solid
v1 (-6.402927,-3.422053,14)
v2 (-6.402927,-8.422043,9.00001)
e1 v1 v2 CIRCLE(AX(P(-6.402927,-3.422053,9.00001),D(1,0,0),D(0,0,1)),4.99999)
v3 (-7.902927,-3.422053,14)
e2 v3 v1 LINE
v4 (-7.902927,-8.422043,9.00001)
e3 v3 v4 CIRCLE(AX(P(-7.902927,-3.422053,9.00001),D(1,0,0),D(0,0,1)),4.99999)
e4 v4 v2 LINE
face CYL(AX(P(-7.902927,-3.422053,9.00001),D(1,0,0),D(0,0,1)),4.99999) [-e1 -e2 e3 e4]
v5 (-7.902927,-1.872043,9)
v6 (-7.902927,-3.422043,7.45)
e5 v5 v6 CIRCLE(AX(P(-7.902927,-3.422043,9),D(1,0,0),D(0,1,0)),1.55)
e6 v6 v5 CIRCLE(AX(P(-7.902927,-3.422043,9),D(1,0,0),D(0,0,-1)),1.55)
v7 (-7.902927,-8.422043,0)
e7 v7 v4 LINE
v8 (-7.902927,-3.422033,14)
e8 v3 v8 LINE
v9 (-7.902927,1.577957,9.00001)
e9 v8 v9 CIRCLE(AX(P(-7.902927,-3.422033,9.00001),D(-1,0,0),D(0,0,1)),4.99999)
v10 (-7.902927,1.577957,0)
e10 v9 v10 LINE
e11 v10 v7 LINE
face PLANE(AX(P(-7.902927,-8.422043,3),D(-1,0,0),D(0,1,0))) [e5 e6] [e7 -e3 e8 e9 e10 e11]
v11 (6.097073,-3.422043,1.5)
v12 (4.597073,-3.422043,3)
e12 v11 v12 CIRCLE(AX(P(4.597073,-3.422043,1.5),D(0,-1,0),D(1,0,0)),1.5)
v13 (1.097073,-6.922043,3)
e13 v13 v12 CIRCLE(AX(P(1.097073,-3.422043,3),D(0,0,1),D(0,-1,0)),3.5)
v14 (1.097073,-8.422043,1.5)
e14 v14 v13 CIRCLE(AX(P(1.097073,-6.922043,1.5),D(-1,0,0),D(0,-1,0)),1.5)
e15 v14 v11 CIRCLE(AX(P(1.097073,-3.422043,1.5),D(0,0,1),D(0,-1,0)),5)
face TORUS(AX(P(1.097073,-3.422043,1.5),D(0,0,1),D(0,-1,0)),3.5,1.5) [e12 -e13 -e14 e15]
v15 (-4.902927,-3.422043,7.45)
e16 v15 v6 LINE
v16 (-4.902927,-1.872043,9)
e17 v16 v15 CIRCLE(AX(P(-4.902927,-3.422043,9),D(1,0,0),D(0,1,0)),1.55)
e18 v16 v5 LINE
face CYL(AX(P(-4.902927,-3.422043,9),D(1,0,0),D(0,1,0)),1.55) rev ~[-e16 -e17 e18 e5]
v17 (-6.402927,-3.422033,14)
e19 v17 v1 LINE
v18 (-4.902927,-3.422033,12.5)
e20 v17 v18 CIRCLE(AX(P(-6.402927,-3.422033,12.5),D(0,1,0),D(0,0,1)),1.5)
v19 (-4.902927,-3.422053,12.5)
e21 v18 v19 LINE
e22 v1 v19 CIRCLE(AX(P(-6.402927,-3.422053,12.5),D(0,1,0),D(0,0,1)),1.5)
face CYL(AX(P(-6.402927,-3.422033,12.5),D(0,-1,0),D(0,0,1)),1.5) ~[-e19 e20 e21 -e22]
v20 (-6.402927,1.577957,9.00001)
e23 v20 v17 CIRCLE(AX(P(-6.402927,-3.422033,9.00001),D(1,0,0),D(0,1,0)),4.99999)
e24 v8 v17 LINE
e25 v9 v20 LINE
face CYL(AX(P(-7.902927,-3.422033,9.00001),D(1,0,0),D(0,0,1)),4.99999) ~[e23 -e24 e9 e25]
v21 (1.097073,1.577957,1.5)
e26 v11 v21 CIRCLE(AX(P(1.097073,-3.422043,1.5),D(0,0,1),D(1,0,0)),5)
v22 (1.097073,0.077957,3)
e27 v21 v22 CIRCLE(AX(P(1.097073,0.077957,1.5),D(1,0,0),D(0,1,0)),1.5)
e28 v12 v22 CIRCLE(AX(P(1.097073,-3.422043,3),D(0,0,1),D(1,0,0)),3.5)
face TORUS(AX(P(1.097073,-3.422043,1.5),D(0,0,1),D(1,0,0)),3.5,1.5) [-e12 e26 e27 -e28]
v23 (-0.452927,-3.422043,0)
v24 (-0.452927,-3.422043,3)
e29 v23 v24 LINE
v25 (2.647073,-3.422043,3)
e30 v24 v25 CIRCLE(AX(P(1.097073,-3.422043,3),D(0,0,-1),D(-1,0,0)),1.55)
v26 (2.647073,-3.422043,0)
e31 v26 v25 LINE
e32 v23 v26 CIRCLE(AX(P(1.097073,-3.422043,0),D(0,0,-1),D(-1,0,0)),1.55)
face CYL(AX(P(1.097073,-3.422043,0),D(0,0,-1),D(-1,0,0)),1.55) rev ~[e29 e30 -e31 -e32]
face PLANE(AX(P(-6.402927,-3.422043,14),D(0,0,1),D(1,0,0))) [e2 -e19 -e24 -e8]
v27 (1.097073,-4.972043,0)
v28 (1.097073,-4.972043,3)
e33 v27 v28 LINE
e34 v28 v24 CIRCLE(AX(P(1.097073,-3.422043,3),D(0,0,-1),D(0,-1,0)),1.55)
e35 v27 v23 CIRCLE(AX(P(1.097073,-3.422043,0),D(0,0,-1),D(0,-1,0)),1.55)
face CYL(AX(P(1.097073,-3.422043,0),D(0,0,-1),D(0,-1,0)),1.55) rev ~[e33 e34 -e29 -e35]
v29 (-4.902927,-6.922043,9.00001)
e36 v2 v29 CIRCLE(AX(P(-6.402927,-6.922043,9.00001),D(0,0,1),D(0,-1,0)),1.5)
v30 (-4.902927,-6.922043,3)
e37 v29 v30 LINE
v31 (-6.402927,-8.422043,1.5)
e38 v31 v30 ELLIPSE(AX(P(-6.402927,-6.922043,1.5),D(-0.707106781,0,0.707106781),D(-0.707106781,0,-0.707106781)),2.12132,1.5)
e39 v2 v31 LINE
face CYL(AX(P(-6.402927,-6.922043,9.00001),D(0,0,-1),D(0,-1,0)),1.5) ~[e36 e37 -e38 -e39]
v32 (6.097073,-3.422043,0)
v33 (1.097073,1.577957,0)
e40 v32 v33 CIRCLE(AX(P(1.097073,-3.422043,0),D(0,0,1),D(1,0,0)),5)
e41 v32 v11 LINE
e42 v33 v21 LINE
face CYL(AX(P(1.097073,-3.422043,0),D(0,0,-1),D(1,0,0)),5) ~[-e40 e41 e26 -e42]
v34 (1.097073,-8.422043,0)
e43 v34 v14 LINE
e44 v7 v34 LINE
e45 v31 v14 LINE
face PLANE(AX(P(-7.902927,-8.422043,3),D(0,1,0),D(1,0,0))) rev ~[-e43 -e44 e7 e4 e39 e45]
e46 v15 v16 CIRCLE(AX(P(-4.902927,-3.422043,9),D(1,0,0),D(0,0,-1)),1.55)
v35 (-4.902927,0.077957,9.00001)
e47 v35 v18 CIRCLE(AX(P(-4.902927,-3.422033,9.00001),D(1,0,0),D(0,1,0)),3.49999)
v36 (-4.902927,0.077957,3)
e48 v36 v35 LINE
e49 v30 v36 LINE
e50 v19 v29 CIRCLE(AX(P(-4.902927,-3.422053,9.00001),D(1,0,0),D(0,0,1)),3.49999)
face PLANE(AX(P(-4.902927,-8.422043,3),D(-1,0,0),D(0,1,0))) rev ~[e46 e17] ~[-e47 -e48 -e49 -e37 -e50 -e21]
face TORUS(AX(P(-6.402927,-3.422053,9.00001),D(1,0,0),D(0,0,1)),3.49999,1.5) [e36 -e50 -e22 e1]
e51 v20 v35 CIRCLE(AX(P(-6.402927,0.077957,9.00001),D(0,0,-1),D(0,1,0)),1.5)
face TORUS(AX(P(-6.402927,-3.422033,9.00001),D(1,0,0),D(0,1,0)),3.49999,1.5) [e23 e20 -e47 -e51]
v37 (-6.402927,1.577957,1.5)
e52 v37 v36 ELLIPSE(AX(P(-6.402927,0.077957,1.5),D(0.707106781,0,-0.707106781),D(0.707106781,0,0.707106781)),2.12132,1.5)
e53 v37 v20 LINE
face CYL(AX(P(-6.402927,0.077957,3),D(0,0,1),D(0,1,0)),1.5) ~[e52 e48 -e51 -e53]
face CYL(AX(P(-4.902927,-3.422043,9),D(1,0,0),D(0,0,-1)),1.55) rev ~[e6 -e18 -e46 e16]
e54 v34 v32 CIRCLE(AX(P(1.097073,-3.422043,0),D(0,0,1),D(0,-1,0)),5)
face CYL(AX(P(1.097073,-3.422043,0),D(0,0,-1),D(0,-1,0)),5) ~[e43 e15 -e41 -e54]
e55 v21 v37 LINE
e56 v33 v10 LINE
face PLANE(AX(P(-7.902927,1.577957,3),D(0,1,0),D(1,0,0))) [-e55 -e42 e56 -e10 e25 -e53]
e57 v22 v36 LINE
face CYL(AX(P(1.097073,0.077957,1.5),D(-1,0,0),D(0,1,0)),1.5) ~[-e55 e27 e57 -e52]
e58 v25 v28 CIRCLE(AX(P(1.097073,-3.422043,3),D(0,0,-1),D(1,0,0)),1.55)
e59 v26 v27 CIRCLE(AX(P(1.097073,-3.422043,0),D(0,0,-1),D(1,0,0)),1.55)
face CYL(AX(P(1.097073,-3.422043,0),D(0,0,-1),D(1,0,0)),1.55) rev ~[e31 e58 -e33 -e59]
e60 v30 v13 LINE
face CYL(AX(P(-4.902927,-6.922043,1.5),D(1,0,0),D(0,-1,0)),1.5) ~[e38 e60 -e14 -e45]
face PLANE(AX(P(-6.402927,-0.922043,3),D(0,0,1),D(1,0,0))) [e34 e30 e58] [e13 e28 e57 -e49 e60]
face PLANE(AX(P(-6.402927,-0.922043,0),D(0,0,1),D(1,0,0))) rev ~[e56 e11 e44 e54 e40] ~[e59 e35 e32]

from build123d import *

# Parameters (mm, degrees)
F0_W     = 3
F0_H     = 5
F1_DEPTH = 3
F2_W     = 3
F2_H     = 10
F3_DEPTH = 11
F5_DEPTH = 25
F6_R     = 4.99999
F7_R     = 1.5


# Not quite as in the source:
# - a fillet or chamfer is up to 0.001 mm smaller than in the source, because OpenCascade refuses the exact size


with BuildPart() as f1:
    # F0 (on Top) → F1 (new body)
    with BuildSketch(Plane.XY):
        with Locations((-6.4029270411, -0.9220428518)):
            Rectangle(F0_W, F0_H)
        with Locations((-6.4029270411, -5.9220428518)):
            Rectangle(F0_W, F0_H)
        with BuildLine():
            Line((-4.9029270411, 1.5779571482), (-4.9029270411, -3.4220428518))
            Line((-4.9029270411, -3.4220428518), (-0.4529270411, -3.4220428518))
            ThreePointArc((-0.4529270411, -3.4220428518), (1.0970729589, -1.8720428518), (2.6470729589, -3.4220428518))
            ThreePointArc((2.6470729589, -3.4220428518), (2.1930884698, -4.5180583627), (1.0970729589, -4.9720428518))
            Line((1.0970729589, -4.9720428518), (1.0970729589, -8.4220428518))
            ThreePointArc((1.0970729589, -8.4220428518), (4.6326068649, -6.9575767578), (6.0970729589, -3.4220428518))
            ThreePointArc((6.0970729589, -3.4220428518), (4.6326068649, 0.1134910541), (1.0970729589, 1.5779571482))
            Line((1.0970729589, 1.5779571482), (-4.9029270411, 1.5779571482))
        make_face()
        with BuildLine():
            Line((-0.4529270411, -3.4220428518), (-4.9029270411, -3.4220428518))
            Line((-4.9029270411, -3.4220428518), (-4.9029270411, -8.4220428518))
            Line((-4.9029270411, -8.4220428518), (1.0970729589, -8.4220428518))
            Line((1.0970729589, -8.4220428518), (1.0970729589, -4.9720428518))
            ThreePointArc((1.0970729589, -4.9720428518), (0.0010574481, -4.5180583627), (-0.4529270411, -3.4220428518))
        make_face()
    extrude(amount=F1_DEPTH)

    # F2 (on face) → F3 (join)
    with BuildSketch(Plane.XY.offset(3)):
        with Locations((-6.4029270411, -3.4220428518)):
            Rectangle(F2_W, F2_H)
    extrude(amount=F3_DEPTH)

    # F4 (on face) → F5 (cut)
    with BuildSketch(Plane.YZ.offset(-4.9029270411)):
        with BuildLine():
            ThreePointArc((-1.8720428518, 9), (-4.5180583627, 10.0960155108), (-3.4220428518, 7.45))
            Line((-3.4220428518, 7.45), (-3.4220428518, 9))
            Line((-3.4220428518, 9), (-1.8720428518, 9))
        make_face()
        with BuildLine():
            Line((-3.4220428518, 9), (-3.4220428518, 7.45))
            ThreePointArc((-3.4220428518, 7.45), (-2.326027341, 7.9039844892), (-1.8720428518, 9))
            Line((-1.8720428518, 9), (-3.4220428518, 9))
        make_face()
    extrude(amount=-F5_DEPTH, mode=Mode.SUBTRACT)

    # F6 (radius 5 in the source; OpenCascade refuses exactly that, so slightly less here)
    f6_edges = [f1.edges().sort_by_distance(p)[0] for p in [
        (-6.402927, -8.422043, 14),
        (-6.402927, 1.577957, 14),
    ]]
    fillet(f6_edges, radius=F6_R)

    # F7
    f7_edges = [f1.edges().sort_by_distance(p)[0] for p in [
        (-4.902927, -6.95758, 12.535537),
        (-4.902927, -8.422043, 6.000005),
        (-1.902927, -8.422043, 3),
    ]]
    fillet(f7_edges, radius=F7_R)


solid = f1.part
